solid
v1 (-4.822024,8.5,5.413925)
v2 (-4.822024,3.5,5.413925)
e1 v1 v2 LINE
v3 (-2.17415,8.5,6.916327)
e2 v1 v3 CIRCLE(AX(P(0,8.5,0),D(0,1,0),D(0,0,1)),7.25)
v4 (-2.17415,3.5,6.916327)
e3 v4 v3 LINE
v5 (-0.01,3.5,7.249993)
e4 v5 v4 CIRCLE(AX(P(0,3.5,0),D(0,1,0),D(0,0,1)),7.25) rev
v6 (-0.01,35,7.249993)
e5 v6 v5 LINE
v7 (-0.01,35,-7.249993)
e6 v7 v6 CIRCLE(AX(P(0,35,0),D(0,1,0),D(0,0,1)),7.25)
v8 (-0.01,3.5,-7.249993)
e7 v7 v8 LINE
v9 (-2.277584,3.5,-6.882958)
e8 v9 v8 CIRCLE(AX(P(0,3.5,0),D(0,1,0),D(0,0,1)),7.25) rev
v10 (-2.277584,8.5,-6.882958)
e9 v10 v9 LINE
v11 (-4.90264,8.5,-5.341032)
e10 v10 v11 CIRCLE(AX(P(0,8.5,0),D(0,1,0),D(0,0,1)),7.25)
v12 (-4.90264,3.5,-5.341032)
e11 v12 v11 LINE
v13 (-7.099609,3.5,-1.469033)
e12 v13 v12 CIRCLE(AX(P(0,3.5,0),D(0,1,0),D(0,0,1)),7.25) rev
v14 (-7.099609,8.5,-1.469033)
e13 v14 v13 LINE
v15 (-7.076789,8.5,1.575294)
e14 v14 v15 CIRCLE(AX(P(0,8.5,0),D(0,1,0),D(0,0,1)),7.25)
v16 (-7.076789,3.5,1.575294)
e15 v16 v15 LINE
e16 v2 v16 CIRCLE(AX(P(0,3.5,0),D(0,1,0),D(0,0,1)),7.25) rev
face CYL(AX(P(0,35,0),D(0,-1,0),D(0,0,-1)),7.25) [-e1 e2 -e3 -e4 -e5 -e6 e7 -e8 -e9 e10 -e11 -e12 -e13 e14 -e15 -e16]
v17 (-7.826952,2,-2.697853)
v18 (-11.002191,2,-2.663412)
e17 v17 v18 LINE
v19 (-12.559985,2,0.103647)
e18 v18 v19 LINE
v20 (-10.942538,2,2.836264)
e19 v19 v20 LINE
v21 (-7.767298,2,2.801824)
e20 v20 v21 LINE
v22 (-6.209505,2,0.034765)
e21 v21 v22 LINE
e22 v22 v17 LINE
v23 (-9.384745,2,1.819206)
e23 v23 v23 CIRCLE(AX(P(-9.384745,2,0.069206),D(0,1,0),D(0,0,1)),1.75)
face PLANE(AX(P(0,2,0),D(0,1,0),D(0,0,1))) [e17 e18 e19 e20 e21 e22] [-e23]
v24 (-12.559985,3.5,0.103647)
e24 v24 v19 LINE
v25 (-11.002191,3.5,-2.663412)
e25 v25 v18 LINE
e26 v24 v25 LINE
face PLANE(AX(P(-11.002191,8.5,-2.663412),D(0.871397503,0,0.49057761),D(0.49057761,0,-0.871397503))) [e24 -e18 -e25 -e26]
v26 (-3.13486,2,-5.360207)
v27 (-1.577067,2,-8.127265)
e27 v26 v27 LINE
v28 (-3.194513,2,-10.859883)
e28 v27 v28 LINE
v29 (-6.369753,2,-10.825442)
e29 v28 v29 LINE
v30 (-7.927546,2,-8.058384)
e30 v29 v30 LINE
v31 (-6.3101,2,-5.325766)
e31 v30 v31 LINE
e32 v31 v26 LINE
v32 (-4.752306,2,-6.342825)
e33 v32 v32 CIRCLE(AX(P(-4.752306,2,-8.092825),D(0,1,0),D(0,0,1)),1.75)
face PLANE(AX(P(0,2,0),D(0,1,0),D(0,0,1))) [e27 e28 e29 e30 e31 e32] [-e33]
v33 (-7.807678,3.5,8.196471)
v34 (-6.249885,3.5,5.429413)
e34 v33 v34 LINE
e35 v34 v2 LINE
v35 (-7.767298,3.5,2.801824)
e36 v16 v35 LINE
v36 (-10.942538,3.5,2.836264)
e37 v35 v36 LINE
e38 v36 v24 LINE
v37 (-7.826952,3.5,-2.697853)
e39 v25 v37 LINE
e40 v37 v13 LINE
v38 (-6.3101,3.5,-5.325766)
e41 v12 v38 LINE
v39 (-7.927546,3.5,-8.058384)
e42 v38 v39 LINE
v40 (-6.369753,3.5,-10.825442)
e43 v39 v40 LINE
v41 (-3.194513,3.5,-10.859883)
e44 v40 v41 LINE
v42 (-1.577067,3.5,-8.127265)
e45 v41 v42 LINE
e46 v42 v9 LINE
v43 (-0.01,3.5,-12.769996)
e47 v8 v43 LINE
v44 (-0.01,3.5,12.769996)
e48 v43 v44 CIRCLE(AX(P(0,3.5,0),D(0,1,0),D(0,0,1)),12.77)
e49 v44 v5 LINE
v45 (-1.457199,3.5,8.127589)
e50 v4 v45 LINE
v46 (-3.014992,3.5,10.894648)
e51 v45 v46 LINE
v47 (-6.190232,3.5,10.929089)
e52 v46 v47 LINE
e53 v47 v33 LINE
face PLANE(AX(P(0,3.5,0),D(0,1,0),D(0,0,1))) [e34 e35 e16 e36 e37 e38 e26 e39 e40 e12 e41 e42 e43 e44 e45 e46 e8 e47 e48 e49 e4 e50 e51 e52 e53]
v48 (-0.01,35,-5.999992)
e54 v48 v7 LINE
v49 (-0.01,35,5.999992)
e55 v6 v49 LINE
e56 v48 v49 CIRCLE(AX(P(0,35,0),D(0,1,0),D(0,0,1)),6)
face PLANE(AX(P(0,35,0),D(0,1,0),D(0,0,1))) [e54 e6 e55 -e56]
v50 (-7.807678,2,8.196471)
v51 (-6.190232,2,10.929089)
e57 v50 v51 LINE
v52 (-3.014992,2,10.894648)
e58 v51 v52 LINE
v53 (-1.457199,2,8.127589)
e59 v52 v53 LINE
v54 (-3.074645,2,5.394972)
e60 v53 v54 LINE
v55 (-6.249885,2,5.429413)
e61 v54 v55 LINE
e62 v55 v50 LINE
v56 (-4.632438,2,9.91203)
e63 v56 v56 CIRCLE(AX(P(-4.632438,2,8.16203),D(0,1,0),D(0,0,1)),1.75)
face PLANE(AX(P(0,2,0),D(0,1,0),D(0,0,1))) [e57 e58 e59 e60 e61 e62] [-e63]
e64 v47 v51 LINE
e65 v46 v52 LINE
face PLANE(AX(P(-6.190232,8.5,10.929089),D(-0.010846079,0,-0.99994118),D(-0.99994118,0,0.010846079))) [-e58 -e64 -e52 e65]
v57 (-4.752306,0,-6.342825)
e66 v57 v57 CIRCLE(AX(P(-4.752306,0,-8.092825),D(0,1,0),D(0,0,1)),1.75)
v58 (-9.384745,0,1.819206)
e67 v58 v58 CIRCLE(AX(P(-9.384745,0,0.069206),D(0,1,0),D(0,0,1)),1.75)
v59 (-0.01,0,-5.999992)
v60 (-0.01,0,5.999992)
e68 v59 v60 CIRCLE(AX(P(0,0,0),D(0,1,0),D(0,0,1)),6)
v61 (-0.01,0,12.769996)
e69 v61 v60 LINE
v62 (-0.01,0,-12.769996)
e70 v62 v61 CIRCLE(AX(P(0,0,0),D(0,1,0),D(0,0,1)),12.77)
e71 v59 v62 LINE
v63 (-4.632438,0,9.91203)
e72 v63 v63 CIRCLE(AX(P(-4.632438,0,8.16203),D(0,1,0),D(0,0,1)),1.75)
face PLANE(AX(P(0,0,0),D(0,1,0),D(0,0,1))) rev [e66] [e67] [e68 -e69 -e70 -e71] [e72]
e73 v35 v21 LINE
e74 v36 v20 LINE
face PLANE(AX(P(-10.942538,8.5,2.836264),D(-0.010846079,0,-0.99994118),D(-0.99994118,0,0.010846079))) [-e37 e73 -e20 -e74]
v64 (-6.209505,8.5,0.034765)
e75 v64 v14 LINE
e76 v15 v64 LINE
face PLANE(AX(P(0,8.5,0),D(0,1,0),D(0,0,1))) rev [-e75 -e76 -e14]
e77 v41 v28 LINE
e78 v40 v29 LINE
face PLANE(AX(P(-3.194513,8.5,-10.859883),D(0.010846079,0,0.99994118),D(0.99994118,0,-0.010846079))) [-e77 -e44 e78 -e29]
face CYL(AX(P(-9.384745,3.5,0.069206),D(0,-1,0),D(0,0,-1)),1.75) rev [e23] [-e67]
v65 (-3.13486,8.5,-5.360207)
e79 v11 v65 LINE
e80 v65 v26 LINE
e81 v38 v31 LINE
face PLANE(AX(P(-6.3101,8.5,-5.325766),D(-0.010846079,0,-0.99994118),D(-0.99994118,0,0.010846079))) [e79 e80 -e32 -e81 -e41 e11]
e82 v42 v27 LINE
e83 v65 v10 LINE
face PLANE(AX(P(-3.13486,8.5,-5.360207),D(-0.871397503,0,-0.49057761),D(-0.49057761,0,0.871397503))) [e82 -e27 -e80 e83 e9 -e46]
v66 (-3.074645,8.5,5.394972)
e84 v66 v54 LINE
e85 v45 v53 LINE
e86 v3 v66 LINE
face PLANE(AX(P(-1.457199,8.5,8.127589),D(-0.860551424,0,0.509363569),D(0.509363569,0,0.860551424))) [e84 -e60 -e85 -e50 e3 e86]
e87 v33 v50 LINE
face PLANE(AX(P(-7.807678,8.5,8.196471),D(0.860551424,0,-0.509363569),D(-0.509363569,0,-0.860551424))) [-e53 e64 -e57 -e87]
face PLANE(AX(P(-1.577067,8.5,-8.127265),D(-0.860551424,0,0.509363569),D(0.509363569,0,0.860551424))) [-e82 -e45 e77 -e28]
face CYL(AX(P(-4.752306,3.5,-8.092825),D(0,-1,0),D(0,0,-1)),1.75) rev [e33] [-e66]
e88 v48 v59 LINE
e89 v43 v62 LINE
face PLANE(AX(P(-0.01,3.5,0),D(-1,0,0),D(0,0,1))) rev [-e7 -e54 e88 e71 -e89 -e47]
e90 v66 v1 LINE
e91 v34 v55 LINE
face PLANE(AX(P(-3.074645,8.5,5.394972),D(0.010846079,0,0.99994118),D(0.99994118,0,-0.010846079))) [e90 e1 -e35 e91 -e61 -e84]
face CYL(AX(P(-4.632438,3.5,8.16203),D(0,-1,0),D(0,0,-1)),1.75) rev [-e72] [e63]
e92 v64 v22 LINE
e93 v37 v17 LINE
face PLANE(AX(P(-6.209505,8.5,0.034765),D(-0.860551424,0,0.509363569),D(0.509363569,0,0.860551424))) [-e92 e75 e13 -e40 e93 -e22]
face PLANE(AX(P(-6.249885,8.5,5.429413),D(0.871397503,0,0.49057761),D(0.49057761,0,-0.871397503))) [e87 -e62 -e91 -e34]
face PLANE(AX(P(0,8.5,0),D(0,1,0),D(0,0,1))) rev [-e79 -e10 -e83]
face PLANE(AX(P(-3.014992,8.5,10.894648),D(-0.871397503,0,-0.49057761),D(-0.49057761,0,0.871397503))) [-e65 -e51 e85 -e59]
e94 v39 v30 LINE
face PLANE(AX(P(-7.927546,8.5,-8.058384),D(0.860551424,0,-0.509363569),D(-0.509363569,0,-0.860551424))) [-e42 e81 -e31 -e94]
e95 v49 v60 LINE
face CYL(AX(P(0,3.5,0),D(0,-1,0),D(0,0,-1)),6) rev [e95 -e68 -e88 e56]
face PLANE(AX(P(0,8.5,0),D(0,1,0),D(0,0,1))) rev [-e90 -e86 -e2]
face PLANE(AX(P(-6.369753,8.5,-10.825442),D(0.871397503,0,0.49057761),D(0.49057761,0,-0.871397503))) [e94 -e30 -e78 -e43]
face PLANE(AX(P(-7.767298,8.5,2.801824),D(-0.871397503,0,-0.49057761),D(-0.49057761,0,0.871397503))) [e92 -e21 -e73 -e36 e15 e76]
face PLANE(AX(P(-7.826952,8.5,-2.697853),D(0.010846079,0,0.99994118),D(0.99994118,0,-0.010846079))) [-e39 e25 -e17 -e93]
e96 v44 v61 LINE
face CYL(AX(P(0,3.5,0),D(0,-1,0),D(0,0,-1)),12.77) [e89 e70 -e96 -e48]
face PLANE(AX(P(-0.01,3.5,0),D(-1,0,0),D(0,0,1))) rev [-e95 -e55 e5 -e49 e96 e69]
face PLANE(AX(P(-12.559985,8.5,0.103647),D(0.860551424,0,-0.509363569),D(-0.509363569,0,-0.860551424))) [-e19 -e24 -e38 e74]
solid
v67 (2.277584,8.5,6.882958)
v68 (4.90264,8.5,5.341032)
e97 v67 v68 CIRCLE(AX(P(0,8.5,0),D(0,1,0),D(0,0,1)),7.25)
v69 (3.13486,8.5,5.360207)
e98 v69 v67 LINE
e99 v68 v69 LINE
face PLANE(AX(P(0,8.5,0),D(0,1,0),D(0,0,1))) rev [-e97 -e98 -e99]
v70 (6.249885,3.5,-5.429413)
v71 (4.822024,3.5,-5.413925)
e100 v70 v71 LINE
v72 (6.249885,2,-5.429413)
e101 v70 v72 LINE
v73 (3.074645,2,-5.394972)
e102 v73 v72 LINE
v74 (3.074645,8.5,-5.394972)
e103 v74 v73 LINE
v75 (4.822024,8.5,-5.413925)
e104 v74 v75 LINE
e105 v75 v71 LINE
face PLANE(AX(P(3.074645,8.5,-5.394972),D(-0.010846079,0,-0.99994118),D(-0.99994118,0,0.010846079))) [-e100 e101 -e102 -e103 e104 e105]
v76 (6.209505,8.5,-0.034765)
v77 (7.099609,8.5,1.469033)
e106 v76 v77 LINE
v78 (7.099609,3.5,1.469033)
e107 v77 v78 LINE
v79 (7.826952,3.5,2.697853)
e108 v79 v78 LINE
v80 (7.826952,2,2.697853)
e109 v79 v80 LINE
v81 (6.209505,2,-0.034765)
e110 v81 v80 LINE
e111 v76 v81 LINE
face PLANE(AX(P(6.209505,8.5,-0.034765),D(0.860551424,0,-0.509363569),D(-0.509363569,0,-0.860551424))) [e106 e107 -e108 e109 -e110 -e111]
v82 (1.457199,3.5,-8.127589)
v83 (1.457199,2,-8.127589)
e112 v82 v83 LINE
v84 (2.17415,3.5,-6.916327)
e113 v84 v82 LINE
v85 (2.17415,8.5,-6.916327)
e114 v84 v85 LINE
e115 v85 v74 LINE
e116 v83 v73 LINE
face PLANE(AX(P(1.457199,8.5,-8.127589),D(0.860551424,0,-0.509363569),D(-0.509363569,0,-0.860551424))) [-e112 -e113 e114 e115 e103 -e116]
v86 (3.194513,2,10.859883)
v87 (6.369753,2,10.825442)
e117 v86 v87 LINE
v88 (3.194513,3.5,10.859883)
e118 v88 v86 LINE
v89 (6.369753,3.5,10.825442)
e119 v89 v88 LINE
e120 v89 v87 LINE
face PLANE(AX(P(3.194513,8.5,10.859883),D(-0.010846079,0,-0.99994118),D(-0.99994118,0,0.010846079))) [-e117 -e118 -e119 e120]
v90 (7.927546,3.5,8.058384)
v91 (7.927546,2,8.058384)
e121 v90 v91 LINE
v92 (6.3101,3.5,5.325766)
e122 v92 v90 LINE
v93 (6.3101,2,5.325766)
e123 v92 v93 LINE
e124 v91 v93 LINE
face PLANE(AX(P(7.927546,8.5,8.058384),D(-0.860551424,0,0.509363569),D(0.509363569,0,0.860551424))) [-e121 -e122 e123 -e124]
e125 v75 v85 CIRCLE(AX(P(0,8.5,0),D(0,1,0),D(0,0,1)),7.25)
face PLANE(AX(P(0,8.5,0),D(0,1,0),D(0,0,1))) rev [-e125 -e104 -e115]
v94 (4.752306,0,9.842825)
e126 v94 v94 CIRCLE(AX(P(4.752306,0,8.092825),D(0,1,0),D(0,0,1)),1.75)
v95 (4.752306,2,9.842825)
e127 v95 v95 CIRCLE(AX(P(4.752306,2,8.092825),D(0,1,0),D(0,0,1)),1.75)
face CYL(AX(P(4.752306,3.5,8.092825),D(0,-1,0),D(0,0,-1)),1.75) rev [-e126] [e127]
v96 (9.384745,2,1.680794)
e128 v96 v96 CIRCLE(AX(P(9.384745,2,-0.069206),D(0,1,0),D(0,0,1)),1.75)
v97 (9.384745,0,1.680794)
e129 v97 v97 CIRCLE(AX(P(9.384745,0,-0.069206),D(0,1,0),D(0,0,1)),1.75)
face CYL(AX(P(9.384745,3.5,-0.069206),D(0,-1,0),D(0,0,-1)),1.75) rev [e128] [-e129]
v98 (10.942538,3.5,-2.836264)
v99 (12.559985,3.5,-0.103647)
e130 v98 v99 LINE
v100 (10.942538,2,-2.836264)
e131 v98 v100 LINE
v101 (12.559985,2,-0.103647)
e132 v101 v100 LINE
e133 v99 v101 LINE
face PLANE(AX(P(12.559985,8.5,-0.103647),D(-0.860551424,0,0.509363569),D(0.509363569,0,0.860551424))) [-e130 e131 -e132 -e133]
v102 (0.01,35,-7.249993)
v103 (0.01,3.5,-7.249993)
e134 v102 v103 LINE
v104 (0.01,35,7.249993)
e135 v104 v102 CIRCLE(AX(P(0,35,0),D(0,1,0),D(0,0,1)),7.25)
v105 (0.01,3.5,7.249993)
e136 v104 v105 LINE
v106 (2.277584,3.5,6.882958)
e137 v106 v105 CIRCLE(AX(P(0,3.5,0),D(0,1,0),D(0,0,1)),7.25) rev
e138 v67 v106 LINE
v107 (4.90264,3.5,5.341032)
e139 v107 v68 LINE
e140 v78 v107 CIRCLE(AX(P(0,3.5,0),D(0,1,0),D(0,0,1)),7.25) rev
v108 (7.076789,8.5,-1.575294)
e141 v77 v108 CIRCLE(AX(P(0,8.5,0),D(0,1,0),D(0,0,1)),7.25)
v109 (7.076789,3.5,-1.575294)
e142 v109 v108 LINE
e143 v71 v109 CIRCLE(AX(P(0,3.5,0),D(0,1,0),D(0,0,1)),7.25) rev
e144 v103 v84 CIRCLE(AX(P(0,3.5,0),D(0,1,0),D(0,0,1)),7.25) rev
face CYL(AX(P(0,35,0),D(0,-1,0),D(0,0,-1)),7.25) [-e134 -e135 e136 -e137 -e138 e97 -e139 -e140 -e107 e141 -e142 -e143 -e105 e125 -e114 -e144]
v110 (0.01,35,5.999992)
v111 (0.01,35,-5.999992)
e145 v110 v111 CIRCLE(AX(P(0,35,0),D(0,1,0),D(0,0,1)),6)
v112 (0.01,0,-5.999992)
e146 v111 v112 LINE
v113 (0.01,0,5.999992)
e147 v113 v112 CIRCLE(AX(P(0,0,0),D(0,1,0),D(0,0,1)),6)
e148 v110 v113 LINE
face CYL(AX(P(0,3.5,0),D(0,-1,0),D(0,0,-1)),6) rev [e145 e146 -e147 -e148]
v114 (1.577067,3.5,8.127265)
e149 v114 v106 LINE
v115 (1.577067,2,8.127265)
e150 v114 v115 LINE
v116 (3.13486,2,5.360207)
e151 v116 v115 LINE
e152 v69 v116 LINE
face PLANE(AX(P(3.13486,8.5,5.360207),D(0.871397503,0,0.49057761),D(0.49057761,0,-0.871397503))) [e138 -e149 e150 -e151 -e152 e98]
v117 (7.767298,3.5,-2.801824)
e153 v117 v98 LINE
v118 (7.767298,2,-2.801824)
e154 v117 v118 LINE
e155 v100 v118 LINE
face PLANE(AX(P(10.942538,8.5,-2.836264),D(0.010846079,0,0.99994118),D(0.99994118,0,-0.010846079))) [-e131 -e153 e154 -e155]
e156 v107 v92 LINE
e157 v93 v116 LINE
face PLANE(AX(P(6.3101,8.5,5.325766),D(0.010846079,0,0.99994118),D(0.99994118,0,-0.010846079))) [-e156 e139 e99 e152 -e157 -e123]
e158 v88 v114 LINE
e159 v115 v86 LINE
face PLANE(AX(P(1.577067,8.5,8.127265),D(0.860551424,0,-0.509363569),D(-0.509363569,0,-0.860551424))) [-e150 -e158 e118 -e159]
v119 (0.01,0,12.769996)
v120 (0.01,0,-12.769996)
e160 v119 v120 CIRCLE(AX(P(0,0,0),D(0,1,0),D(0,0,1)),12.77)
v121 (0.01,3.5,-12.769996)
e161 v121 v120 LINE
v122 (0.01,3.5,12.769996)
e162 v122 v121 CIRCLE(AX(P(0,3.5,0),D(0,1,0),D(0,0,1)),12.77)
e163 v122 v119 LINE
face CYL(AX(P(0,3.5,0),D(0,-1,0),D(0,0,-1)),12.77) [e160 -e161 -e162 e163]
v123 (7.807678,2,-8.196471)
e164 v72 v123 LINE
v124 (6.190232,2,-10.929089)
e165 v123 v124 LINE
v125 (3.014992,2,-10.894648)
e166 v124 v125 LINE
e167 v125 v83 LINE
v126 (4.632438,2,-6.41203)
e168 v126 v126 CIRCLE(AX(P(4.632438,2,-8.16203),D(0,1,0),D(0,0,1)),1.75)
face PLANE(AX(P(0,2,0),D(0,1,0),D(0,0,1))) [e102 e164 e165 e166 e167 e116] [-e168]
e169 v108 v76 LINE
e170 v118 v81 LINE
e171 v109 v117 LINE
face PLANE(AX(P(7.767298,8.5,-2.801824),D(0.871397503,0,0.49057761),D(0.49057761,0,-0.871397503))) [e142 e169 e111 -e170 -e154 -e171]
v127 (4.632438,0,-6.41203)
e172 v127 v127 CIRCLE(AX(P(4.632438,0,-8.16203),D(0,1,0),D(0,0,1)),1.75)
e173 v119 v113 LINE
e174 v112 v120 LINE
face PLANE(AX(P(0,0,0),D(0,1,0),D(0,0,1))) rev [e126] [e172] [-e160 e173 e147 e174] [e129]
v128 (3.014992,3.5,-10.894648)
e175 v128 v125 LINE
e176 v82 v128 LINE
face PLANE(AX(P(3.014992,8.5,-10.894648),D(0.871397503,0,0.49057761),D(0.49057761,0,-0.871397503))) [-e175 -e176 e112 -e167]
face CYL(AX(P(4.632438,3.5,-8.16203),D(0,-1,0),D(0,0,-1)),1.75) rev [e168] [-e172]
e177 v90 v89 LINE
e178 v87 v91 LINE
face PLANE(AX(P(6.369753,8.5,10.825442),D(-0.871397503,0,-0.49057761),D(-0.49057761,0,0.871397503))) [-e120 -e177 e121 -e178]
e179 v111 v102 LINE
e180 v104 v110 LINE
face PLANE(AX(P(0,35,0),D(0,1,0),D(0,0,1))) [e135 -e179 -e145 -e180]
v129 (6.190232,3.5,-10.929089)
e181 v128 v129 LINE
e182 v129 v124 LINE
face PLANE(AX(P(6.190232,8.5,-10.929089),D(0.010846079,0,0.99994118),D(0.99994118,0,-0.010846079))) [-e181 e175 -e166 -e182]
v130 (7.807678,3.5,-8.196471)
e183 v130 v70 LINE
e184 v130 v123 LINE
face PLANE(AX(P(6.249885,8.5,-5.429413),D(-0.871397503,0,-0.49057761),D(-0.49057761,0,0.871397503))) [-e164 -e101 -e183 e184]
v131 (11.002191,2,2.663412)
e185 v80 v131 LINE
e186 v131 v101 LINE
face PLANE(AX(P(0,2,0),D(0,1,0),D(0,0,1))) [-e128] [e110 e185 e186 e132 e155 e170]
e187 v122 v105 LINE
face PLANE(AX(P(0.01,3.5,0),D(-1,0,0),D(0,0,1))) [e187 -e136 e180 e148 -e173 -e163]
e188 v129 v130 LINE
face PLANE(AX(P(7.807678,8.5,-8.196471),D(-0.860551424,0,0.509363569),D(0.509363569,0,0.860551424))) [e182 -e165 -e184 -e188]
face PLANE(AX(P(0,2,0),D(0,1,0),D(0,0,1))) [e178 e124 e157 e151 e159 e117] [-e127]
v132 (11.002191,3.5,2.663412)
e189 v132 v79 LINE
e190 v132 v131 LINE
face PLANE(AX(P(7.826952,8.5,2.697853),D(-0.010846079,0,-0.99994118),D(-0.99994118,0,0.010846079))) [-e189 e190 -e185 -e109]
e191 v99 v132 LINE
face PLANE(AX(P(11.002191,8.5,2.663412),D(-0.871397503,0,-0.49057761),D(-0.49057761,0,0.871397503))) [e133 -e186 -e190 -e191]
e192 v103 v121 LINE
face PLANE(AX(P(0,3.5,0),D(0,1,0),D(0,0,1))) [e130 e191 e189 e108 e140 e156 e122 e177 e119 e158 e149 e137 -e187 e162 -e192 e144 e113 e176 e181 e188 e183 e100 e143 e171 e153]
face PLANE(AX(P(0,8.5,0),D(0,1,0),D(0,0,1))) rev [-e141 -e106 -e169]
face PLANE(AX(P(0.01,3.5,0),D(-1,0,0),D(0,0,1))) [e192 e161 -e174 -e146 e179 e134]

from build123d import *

# Parameters (mm, degrees)
BOSS_EXTRUDE1_OUTLINE_R = 1.75
BOSS_EXTRUDE1_DEPTH     = 3.5
BOSS_EXTRUDE2_DEPTH     = 35
CUT_EXTRUDE1_DEPTH      = 5
CUT_EXTRUDE1_DEPTH_BACK = 1.5


# Read off the part's stored shape, not the designer's step: Boss-Extrude1
with BuildPart() as part:
    # Boss-Extrude1 outline → Boss-Extrude1 (new body)
    # profile 1 of 2: a face of its own
    with BuildSketch(Plane(origin=(0, 0, 0), x_dir=(1, 0, 0), z_dir=(0, 1, 0))):
        with BuildLine():
            Line((-0.01, 5.999991667), (-0.01, 12.769996085))
            ThreePointArc((-0.01, 12.769996085), (-12.77, 0), (-0.01, -12.769996085))
            Line((-0.01, -12.769996085), (-0.01, -5.999991667))
            ThreePointArc((-0.01, -5.999991667), (-6, 0), (-0.01, 5.999991667))
        make_face()
        with Locations((-4.632438453, -8.162030322)):
            Circle(BOSS_EXTRUDE1_OUTLINE_R, mode=Mode.SUBTRACT)
        with Locations((-9.384744832, -0.069205779)):
            Circle(BOSS_EXTRUDE1_OUTLINE_R, mode=Mode.SUBTRACT)
        with Locations((-4.752306379, 8.092824543)):
            Circle(BOSS_EXTRUDE1_OUTLINE_R, mode=Mode.SUBTRACT)
    # profile 2 of 2: a face of its own
    with BuildSketch(Plane(origin=(0, 0, 0), x_dir=(1, 0, 0), z_dir=(0, 1, 0))):
        with BuildLine():
            ThreePointArc((0.01, 5.999991667), (6, 0), (0.01, -5.999991667))
            Line((0.01, -5.999991667), (0.01, -12.769996085))
            ThreePointArc((0.01, -12.769996085), (12.77, 0), (0.01, 12.769996085))
            Line((0.01, 12.769996085), (0.01, 5.999991667))
        make_face()
        with Locations((4.752306379, -8.092824543)):
            Circle(BOSS_EXTRUDE1_OUTLINE_R, mode=Mode.SUBTRACT)
        with Locations((9.384744832, 0.069205779)):
            Circle(BOSS_EXTRUDE1_OUTLINE_R, mode=Mode.SUBTRACT)
        with Locations((4.632438453, 8.162030322)):
            Circle(BOSS_EXTRUDE1_OUTLINE_R, mode=Mode.SUBTRACT)
    extrude(amount=BOSS_EXTRUDE1_DEPTH)

    # Sketch2<3> → Boss-Extrude2 (add)
    with BuildSketch(Plane(origin=(0, 0, 0), x_dir=(1, 0, 0), z_dir=(0, 1, 0))):
        with BuildLine():
            ThreePointArc((-0.01, -5.999991667), (-6, 0), (-0.01, 5.999991667))
            Line((-0.01, 5.999991667), (-0.01, 7.249993103))
            ThreePointArc((-0.01, 7.249993103), (-7.25, 0), (-0.01, -7.249993103))
            Line((-0.01, -7.249993103), (-0.01, -5.999991667))
        make_face()
        with BuildLine():
            Line((0.01, 7.249993103), (0.01, 5.999991667))
            ThreePointArc((0.01, 5.999991667), (6, 0), (0.01, -5.999991667))
            Line((0.01, -5.999991667), (0.01, -7.249993103))
            ThreePointArc((0.01, -7.249993103), (7.25, 0), (0.01, 7.249993103))
        make_face()
    extrude(amount=BOSS_EXTRUDE2_DEPTH)

    # Sketch3 → Cut-Extrude1 (cut, two sides: drawn at the far end of the back side and taken through both)
    with BuildSketch(Plane(origin=(0, 3.5, 0), x_dir=(1, 0, 0), z_dir=(0, 1, 0)).offset(-CUT_EXTRUDE1_DEPTH_BACK)):
        Polygon((6.249885019, 5.429412541), (7.807678154, 8.196471247), (6.190231587, 10.929089028), (3.014991887, 10.894648103), (1.457198752, 8.127589397), (3.074645319, 5.394971616), align=None)
        Polygon((-3.194513245, 10.859883249), (-6.369752945, 10.825442324), (-7.927546079, 8.058383618), (-6.310099513, 5.325765836), (-3.134859812, 5.360206762), (-1.577066678, 8.127265468), align=None)
        Polygon((7.826951698, -2.697852927), (11.002191398, -2.663412002), (12.559984532, 0.103646704), (10.942537966, 2.836264486), (7.767298265, 2.80182356), (6.209505131, 0.034764854), align=None)
        Polygon((1.577066678, -8.127265468), (3.194513245, -10.859883249), (6.369752945, -10.825442324), (7.927546079, -8.058383618), (6.310099513, -5.325765836), (3.134859812, -5.360206762), align=None)
        Polygon((-6.249885019, -5.429412541), (-7.807678154, -8.196471247), (-6.190231587, -10.929089028), (-3.014991887, -10.894648103), (-1.457198752, -8.127589397), (-3.074645319, -5.394971616), align=None)
        Polygon((-7.826951698, 2.697852927), (-11.002191398, 2.663412002), (-12.559984532, -0.103646704), (-10.942537966, -2.836264486), (-7.767298265, -2.80182356), (-6.209505131, -0.034764854), align=None)
    extrude(amount=CUT_EXTRUDE1_DEPTH + CUT_EXTRUDE1_DEPTH_BACK, mode=Mode.SUBTRACT)


solid = part.part
